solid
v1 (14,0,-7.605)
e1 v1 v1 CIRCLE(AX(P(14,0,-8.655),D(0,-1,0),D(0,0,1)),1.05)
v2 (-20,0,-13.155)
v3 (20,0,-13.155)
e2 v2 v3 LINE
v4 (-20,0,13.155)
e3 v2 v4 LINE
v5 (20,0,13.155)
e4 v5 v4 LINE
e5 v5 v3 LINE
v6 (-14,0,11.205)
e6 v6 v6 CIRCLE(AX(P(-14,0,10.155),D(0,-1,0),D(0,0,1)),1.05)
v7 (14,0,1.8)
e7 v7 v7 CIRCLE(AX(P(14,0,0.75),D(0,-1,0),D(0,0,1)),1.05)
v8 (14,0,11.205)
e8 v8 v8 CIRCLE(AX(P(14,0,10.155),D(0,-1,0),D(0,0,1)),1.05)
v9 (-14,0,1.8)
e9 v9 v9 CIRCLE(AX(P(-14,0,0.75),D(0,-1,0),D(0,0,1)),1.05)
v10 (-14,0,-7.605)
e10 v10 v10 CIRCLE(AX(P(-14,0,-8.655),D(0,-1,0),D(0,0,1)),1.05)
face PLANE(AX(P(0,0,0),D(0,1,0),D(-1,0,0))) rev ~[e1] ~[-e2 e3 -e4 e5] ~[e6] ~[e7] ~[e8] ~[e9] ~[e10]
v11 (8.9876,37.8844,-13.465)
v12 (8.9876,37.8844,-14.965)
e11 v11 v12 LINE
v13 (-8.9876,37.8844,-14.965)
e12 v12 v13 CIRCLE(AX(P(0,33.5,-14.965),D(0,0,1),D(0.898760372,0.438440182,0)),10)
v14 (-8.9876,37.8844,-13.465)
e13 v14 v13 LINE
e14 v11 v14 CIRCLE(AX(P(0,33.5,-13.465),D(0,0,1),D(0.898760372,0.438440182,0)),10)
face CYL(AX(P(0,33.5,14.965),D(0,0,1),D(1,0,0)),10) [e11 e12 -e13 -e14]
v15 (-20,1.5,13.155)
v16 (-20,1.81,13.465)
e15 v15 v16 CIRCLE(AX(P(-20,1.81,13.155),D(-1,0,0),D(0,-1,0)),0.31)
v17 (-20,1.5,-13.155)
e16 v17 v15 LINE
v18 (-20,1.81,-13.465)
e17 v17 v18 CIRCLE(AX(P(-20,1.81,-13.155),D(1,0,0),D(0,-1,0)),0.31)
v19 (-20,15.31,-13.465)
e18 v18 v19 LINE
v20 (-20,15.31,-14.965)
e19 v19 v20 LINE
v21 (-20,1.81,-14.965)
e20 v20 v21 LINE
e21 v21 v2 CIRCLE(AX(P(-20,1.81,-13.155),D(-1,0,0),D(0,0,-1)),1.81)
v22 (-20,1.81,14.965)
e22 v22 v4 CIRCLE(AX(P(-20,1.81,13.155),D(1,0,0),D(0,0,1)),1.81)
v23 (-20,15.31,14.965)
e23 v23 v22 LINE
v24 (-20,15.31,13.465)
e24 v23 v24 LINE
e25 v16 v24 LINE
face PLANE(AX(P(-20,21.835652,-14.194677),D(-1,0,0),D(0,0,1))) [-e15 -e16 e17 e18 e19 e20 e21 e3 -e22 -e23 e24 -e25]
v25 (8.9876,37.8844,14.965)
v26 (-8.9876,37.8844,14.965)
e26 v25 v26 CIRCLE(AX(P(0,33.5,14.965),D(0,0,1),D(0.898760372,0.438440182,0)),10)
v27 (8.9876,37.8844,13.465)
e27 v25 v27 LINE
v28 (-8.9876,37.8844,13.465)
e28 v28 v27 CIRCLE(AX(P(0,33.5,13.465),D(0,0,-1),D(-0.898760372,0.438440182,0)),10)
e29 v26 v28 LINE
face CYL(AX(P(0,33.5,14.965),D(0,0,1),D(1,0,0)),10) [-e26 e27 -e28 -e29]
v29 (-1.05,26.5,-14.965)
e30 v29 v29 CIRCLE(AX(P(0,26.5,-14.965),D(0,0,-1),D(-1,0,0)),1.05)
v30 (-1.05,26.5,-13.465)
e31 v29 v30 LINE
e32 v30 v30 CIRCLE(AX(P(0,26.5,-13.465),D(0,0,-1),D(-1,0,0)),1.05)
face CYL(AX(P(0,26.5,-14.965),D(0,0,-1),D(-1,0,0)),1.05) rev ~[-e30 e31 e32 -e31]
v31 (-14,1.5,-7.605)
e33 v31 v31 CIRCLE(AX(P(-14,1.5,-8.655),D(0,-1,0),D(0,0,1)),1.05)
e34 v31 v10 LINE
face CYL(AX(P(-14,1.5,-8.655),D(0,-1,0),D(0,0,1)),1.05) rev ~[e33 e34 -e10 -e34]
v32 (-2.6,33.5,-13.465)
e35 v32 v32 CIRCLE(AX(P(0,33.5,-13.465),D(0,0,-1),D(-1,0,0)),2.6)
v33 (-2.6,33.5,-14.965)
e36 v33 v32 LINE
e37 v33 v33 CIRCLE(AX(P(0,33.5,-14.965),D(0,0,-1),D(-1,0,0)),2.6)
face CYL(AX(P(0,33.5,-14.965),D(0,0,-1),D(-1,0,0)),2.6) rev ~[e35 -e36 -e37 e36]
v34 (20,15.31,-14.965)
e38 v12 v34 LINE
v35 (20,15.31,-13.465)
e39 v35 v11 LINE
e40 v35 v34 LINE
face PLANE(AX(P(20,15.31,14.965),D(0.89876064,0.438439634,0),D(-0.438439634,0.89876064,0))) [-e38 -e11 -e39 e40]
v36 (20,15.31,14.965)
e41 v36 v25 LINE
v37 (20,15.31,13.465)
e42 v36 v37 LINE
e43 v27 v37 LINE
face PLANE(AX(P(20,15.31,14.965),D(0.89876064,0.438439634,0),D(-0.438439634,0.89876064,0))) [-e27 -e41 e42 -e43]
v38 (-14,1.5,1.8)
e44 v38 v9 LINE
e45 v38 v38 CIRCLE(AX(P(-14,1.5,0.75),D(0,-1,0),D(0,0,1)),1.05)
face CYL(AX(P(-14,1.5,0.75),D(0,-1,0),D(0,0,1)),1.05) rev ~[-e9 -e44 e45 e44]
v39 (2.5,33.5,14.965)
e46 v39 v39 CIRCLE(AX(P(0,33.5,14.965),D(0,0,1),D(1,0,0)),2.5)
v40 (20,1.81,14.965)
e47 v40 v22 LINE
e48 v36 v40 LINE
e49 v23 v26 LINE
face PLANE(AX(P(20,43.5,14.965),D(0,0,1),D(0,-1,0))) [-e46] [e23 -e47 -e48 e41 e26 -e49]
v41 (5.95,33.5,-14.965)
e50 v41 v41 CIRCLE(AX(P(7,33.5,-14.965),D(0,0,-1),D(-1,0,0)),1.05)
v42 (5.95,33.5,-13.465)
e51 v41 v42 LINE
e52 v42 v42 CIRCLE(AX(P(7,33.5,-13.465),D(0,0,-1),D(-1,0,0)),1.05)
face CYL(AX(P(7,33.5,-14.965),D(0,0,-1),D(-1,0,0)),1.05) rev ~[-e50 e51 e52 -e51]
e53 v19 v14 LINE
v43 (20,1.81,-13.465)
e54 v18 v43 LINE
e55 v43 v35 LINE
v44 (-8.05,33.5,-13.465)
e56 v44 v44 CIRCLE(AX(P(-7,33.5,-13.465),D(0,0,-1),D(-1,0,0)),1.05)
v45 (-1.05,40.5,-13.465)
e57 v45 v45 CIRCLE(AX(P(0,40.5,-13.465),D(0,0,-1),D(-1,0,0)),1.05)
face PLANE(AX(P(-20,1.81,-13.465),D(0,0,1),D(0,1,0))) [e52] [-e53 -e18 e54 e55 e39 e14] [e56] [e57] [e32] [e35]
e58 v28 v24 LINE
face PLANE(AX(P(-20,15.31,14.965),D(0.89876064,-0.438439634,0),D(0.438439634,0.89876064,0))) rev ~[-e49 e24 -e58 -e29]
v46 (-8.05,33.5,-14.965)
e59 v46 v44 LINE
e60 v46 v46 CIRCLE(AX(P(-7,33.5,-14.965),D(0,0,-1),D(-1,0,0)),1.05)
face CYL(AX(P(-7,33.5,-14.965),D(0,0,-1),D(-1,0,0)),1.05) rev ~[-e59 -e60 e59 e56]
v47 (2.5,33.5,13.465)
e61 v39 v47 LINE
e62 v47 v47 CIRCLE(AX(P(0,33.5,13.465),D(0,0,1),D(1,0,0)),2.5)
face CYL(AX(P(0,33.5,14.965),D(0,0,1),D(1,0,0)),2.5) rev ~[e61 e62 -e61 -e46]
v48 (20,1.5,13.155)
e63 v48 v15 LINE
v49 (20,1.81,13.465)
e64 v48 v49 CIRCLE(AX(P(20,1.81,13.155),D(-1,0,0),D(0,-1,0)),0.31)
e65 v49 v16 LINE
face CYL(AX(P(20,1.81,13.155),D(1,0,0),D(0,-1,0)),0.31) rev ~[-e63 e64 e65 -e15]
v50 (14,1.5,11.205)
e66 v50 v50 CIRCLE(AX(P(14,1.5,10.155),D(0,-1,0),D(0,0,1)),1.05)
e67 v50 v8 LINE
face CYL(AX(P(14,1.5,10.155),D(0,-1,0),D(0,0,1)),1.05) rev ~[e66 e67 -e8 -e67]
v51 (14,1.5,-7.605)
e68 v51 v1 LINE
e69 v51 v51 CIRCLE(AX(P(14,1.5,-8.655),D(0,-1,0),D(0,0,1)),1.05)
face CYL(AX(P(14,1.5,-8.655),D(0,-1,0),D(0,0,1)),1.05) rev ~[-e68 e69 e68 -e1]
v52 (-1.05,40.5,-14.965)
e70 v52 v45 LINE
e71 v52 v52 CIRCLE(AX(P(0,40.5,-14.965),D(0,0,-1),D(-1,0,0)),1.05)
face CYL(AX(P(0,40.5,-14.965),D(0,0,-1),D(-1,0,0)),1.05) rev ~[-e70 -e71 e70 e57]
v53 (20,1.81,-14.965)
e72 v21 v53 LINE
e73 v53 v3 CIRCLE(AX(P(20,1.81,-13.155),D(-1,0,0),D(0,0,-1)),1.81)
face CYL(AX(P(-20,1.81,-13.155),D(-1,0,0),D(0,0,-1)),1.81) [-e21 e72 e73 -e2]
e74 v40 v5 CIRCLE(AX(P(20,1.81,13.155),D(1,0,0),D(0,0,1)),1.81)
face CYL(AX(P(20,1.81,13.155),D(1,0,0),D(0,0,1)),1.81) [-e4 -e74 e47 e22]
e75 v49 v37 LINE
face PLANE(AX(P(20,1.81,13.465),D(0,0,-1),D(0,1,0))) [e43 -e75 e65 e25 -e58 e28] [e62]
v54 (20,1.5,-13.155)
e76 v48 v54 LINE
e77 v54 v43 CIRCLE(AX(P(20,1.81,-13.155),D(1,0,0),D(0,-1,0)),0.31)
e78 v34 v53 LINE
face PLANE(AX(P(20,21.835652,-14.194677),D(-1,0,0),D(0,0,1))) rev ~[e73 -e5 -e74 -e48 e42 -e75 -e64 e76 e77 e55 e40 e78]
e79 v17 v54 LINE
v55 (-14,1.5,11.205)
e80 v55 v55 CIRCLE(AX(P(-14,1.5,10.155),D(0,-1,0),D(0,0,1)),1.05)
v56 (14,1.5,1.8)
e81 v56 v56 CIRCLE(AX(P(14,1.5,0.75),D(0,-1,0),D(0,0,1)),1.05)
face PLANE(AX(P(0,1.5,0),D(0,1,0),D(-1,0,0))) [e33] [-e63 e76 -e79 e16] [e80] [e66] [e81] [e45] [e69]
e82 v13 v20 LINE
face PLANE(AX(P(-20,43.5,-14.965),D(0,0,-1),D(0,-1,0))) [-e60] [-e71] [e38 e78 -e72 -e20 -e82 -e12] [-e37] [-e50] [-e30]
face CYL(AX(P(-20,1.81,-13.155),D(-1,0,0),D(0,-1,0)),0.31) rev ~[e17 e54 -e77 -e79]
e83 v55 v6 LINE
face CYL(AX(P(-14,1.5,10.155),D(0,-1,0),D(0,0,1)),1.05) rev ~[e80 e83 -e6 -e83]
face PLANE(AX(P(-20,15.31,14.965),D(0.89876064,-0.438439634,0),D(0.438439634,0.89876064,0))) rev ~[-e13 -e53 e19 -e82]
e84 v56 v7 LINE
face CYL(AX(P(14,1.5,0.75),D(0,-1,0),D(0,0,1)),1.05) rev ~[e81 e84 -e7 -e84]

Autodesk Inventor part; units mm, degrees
ref_plane "YZ Plane" through (0, 0, 0) normal (1, 0, 0) x (0, 1, 0)
ref_plane "XZ Plane" through (0, 0, 0) normal (0, 1, 0) x (-1, 0, 0)
ref_plane "XY Plane" through (0, 0, 0) normal (0, 0, 1) x (1, 0, 0)
sketch "Sketch1" plane through (0, 0, 0) normal (0, 1, 0) x (-1, 0, 0)
  line L0 (20, 14.965) -> (-20, 14.965)
  line L1 (-20, 14.965) -> (-20, -14.965)
  line L2 (-20, -14.965) -> (20, -14.965)
  line L3 (20, -14.965) -> (20, 14.965)
  point P0 (0, 0)
  dimension "d0" = 29.93
  dimension "d1" = 40
  dimension "d2" = 20
  dimension "d3" = 14.965
extrude "Plate1" add sketch "Sketch1" along normal blind 1.5
sketch "Sketch2" plane through (-20, 0, -13.465) normal (0, 0, -1) x (-1, 0, 0)
  line L0 (-40, 0) -> (0, 0)
  line L1 (0, 0) -> (0, 43.5)
  line L2 (0, 43.5) -> (-40, 43.5)
  line L3 (-40, 43.5) -> (-40, 0)
edge flange "Flange1" height 43.5 angle 90 thickness 1.5 bend radius 0.31 thickness toward (0, 0, -1) relief tear relief width 1.5 relief depth 0.75 corner gap 0.31 corner form 0 edges at (0, 1.5, -14.965) (0, 1.5, 14.965) wall of the first edge with corners at (20, 0, -13.465) (-20, 0, -13.465) (-20, 43.5, -13.465) (20, 43.5, -13.465)
bend "Bend1"
corner "Corner1"
sketch "Sketch3" plane through (-20, 43.5, 14.965) normal (0, 0, 1) x (1, 0, 0)
  line L0 (0, 0) -> (40, 0) projected
  line L1 (0, -41.69) -> (0, 0) projected
  circle A0 centre (20, -10) radius 10
  line L2 (0, -28.19) -> (40, -28.19)
  line L3 (40, -28.19) -> (40, -38.19)
  line L4 (40, -38.19) -> (0, -38.19)
  line L5 (0, -38.19) -> (0, -28.19)
  line L6 (40, -28.19) -> (28.9876, -5.6156)
  line L7 (0, -28.19) -> (11.0124, -5.6156)
  line L8 (0, 0) -> (40, 0)
  line L9 (40, 0) -> (40, -35)
  line L10 (40, -35) -> (0, -35)
  line L11 (0, -35) -> (0, 0)
  point P0 (20, -43.5)
  point P1 (20, 0)
  point P2 (0, -28.19)
  point P3 (0, -35)
  point P4 (30, -10)
  dimension "d15" = 10
  dimension "d16" = 0
  dimension "d17" = 20
  dimension "d18" = 18.19
  dimension "d19" = 0
  dimension "d20" = 40
  dimension "d21" = 10
  dimension "d22" = 35
extrude "Extrusion1" cut sketch "Sketch3" against normal blind 35 contours L0 A0 L7 L1 | L0 L9 L6 A0
sketch "Sketch4" plane through (20, 1.81, -14.965) normal (0, 0, -1) x (-1, 0, 0)
  arc A0 (28.9876, 36.0744) -> (11.0124, 36.0744) centre (20, 31.69) ccw projected
  circle A1 centre (20, 31.69) radius 2.6
  circle A2 centre (13, 31.69) radius 1.05
  circle A3 centre (27, 31.69) radius 1.05
  circle A4 centre (20, 38.69) radius 1.05
  circle A5 centre (20, 24.69) radius 1.05
  point P0 (20, -1.81)
  dimension "d25" = 5.2
  dimension "d26" = 0
  dimension "d27" = 7
  dimension "d28" = 2.1
  dimension "d29" = 7
  dimension "d30" = 0
  dimension "d31" = 2.1
  dimension "d32" = 0
  dimension "d33" = 7
  dimension "d34" = 2.1
  dimension "d35" = 7
  dimension "d36" = 0
  dimension "d37" = 2.1
extrude "Extrusion2" cut sketch "Sketch4" against normal blind 1.5
sketch "Sketch5" plane through (-20, 1.81, 14.965) normal (0, 0, 1) x (1, 0, 0)
  arc A0 (28.9876, 36.0744) -> (11.0124, 36.0744) centre (20, 31.69) ccw projected
  circle A1 centre (20, 31.69) radius 2.5
  point P0 (20, -1.81)
  dimension "d40" = 5
extrude "Extrusion3" cut sketch "Sketch5" against normal blind 1.5
sketch "Sketch6" plane through (0, 1.5, 0) normal (0, 1, 0) x (1, 0, 0)
  circle A0 centre (-14, -10.155) radius 1.05 projected
  circle A1 centre (-14, -0.75) radius 1.05 projected
  circle A2 centre (-14, 8.655) radius 1.05 projected
  circle A3 centre (14, -10.155) radius 1.05 projected
  circle A4 centre (14, -0.75) radius 1.05 projected
  circle A5 centre (14, 8.655) radius 1.05 projected
  point P0 (0, 0)
hole "Hole1" at (14, 1.5, -8.655) at (14, 1.5, 0.75) at (14, 1.5, 10.155) at (-14, 1.5, 10.155) at (-14, 1.5, 0.75) at (-14, 1.5, -8.655) direction (0, -1, 0) diameter 2.1 depth 1.5
equation "\"d48\" = Thickness"
equation "\"d4\" = Thickness"
equation "\"d5\" = BendReliefWidth"
equation "\"d6\" = BendReliefDepth"
equation "\"d7\" = MinimumRemnant"
equation "\"d8\" = TransitionRadius"
equation "\"d11\" = BendRadius"
equation "\"d12\" = CornerReliefSize"
equation "\"d13\" = GapSize"
equation "\"d14\" = JacobiRadiusSize"
equation "\"BendReliefWidth\" = Thickness"
equation "\"BendReliefDepth\" = 0.5 * Thickness"
equation "\"CornerReliefSize\" = 4 * Thickness"
equation "\"MinimumRemnant\" = 2 * Thickness"
equation "\"TransitionRadius\" = BendRadius"
equation "\"JacobiRadiusSize\" = BendRadius"
equation "\"GapSize\" = Thickness"
equation "\"Thickness\" = 1.5"
equation "\"BendRadius\" = 0.31"
properties part number "partpart" material "Aluminum 6061-AHC"
